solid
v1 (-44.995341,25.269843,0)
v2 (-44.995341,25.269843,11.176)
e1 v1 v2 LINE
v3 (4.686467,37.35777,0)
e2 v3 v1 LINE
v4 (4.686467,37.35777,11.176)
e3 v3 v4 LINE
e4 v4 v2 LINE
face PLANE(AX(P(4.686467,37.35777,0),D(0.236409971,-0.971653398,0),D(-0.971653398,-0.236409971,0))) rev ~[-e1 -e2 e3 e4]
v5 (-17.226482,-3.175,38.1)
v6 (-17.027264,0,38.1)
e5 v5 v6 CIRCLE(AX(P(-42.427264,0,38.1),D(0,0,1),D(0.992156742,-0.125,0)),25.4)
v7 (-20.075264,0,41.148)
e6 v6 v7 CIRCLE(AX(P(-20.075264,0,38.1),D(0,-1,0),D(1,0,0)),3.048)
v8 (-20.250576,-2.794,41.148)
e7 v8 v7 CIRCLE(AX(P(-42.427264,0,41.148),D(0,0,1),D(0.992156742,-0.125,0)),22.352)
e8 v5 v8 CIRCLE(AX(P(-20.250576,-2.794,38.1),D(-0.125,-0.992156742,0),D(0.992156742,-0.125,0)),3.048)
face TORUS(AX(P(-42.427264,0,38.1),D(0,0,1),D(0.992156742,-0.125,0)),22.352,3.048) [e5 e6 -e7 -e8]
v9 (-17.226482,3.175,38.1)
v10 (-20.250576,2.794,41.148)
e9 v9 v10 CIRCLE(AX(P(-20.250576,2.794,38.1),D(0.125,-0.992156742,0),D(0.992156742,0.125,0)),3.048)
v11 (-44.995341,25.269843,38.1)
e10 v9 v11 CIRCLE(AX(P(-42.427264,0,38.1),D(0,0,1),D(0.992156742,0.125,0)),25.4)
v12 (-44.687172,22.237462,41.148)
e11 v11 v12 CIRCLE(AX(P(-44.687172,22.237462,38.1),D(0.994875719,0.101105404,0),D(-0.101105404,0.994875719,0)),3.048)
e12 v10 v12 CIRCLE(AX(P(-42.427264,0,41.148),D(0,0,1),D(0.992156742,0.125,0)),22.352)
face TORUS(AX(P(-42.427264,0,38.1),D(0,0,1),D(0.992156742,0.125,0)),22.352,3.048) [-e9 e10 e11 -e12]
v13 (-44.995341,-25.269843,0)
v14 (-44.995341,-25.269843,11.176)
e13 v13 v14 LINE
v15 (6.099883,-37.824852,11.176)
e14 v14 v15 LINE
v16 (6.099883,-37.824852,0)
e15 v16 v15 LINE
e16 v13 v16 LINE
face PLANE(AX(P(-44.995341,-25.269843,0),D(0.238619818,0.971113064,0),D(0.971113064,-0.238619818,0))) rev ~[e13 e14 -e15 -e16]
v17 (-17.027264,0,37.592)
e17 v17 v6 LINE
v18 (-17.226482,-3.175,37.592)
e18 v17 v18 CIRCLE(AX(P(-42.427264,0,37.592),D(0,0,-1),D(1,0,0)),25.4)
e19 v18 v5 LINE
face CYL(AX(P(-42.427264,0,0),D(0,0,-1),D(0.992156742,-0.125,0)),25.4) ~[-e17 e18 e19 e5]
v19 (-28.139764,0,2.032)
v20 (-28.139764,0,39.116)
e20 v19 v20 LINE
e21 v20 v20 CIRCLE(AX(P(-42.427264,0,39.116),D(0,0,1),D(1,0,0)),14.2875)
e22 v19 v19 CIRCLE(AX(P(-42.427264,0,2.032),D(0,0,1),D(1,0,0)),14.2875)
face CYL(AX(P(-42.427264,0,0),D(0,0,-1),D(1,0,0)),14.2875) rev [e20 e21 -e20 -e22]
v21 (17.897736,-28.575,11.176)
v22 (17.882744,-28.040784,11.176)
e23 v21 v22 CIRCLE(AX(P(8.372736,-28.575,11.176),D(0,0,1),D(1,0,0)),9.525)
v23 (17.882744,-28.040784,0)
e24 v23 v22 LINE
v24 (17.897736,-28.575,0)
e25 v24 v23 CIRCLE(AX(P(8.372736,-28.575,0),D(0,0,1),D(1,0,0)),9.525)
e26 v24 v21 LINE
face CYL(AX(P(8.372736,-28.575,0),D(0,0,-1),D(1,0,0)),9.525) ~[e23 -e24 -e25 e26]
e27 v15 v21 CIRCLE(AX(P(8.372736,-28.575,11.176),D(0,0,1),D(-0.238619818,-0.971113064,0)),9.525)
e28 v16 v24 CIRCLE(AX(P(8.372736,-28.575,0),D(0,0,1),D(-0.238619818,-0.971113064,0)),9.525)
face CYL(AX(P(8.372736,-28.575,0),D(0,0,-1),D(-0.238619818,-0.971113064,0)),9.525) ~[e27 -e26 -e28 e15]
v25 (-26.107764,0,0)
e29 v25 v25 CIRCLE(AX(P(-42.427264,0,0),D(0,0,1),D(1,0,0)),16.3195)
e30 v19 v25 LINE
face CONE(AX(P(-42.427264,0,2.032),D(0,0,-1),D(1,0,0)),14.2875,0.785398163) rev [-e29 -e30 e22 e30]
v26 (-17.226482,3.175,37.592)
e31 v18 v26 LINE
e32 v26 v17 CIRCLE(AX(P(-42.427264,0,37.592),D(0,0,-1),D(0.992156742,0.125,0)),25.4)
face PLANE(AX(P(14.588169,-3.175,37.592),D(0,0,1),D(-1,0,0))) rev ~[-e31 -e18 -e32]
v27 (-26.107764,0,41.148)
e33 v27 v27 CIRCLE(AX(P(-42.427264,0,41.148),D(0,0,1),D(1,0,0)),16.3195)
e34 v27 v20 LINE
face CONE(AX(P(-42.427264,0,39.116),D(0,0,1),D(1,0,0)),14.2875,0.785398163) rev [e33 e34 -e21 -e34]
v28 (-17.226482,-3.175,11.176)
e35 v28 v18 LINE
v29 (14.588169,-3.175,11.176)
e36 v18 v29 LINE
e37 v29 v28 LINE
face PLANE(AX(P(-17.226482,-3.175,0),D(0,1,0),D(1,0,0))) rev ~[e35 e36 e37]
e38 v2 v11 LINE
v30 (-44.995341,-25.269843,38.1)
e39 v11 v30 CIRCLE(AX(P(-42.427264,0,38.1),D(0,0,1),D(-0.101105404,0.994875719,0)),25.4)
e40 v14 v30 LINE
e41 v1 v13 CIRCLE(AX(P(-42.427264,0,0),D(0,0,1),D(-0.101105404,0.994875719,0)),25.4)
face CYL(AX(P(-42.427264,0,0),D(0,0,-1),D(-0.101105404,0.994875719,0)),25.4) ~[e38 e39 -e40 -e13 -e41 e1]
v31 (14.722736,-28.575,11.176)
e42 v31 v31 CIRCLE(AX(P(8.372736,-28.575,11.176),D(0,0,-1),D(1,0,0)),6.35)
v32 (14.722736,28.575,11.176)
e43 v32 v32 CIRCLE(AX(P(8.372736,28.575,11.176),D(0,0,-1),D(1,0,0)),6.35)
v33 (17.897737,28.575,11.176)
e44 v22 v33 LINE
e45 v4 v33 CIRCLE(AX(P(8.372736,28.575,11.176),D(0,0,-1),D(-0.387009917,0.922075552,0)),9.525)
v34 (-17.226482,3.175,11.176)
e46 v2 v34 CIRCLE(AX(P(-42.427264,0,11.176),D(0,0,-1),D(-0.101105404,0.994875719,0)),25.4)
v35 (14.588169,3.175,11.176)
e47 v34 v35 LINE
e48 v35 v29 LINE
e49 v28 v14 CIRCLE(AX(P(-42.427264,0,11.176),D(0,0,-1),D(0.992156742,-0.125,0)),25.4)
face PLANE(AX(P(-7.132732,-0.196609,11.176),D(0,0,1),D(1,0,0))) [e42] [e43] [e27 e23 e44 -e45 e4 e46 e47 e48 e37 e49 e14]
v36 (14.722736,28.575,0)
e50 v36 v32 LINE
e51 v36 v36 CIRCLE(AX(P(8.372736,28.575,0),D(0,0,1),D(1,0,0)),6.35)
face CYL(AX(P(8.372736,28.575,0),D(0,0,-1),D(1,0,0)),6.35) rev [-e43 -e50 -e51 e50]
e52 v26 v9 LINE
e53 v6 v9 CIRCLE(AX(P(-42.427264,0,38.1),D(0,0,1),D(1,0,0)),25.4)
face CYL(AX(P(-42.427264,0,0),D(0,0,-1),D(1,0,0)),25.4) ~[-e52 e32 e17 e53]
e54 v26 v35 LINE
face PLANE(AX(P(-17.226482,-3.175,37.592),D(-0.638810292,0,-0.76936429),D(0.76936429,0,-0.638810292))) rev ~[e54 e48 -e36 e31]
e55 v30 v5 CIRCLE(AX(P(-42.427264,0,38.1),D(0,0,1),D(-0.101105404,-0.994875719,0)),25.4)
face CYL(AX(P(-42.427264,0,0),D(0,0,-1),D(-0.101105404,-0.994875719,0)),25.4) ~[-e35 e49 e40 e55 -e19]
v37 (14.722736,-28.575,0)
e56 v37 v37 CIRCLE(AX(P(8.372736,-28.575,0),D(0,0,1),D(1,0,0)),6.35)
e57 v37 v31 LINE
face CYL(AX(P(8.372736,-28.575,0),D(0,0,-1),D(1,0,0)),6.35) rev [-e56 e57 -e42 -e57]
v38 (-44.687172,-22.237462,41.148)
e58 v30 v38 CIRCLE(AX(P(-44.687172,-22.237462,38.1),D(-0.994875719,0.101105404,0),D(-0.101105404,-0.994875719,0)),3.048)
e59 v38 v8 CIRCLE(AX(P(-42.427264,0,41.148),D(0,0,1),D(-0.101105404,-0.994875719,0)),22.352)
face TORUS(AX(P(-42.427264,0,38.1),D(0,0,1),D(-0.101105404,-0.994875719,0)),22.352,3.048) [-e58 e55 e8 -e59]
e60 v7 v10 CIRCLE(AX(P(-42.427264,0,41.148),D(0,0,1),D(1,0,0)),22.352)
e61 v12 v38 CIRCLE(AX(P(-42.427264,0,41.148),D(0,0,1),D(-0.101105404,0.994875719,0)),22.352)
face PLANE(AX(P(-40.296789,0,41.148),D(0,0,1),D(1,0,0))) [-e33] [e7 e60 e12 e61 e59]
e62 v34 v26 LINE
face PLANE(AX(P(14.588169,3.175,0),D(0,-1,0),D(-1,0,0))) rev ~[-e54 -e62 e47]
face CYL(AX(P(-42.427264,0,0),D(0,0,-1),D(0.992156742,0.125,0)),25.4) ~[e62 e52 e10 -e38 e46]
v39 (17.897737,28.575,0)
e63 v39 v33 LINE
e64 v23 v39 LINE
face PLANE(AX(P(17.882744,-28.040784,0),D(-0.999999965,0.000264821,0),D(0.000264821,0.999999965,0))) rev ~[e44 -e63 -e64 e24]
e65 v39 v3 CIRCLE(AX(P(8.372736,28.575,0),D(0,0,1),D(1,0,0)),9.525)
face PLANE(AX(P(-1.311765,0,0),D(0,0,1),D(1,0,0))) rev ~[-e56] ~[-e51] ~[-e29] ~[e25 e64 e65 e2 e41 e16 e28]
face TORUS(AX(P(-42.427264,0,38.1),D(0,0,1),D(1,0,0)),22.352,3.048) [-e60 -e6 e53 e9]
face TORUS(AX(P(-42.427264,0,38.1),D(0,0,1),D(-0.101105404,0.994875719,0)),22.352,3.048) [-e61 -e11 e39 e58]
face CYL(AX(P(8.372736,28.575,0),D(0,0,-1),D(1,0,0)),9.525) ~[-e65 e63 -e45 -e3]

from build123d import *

# Parameters (mm, degrees)
F0_R     = 14.2875
F1_DEPTH = 41.148
F0_R_2   = 6.35
F2_DEPTH = 11.176
F3_DEPTH = 37.592
F5_DEPTH = 127
F6_DEPTH = 76.2
F7_R     = 3.048
F8_SIZE2 = 2.032
F8_SIZE  = 2.032
F9_SIZE2 = 2.032
F9_SIZE  = 2.032


# Not quite as in the source:
# - ends of sketch curves that miss each other by under 0.0002 mm in the source are joined


with BuildPart() as f1:
    # F0 (on Top) → F1 (new body)
    with BuildSketch(Plane.XY):
        with BuildLine():
            ThreePointArc((-17.226482478, 3.175), (-26.6125443992, 19.8759818106), (-44.9953409853, 25.2698432749))
            ThreePointArc((-44.9953409853, 25.2698432749), (-67.8272637159, 0), (-44.9953409853, -25.2698432749))
            ThreePointArc((-44.9953409853, -25.2698432749), (-26.6125443992, -19.8759818106), (-17.226482478, -3.175))
            Line((-17.226482478, -3.175), (-23.8334226287, -3.175))
            Line((-23.8334226287, -3.175), (-23.8334226287, 3.175))
            Line((-23.8334226287, 3.175), (-17.226482478, 3.175))
        make_face()
        with Locations((-42.4272637159, 0)):
            Circle(F0_R, mode=Mode.SUBTRACT)
        with BuildLine():
            ThreePointArc((-17.0272637159, 0), (-17.0771173313, 1.5906219786), (-17.226482478, 3.175))
            Line((-17.226482478, 3.175), (-23.8334226287, 3.175))
            Line((-23.8334226287, 3.175), (-23.8334226287, -3.175))
            Line((-23.8334226287, -3.175), (-17.226482478, -3.175))
            ThreePointArc((-17.226482478, -3.175), (-17.0771173313, -1.5906219786), (-17.0272637159, 0))
        make_face()
    extrude(amount=F1_DEPTH)

    # F0 (on Top) → F2 (join)
    with BuildSketch(Plane.XY):
        with BuildLine():
            Line((4.6864668266, 37.3577696364), (-44.9953409853, 25.2698432749))
            ThreePointArc((-44.9953409853, 25.2698432749), (-26.6125443992, 19.8759818106), (-17.226482478, 3.175))
            Line((-17.226482478, 3.175), (14.5881694606, 3.175))
            Line((14.5881694606, 3.175), (14.5881694606, -3.175))
            Line((14.5881694606, -3.175), (-17.226482478, -3.175))
            ThreePointArc((-17.226482478, -3.175), (-26.6125443992, -19.8759818106), (-44.9953409853, -25.2698432749))
            Line((-44.9953409853, -25.2698432749), (6.0998825197, -37.8248519321))
            ThreePointArc((6.0998825197, -37.8248519321), (2.2878291463, -21.247003676), (17.8827435435, -28.0407838216))
            Line((17.8827435435, -28.0407838216), (17.8977366181, 28.575))
            ThreePointArc((17.8977366181, 28.575), (3.0995063243, 20.6428709799), (4.6864668266, 37.3577696364))
        make_face()
        with BuildLine():
            ThreePointArc((17.8827435435, -28.0407838216), (2.2878291463, -21.247003676), (6.0998825197, -37.8248519321))
            ThreePointArc((6.0998825197, -37.8248519321), (14.2496697061, -36.0708174039), (17.8977362841, -28.575))
            ThreePointArc((17.8977362841, -28.575), (17.8939873612, -28.307786739), (17.8827435435, -28.0407838216))
        make_face()
        with Locations((8.3727362841, -28.575)):
            Circle(F0_R_2, mode=Mode.SUBTRACT)
        with BuildLine():
            ThreePointArc((4.6864668266, 37.3577696364), (3.0995063243, 20.6428709799), (17.8977362841, 28.575))
            ThreePointArc((17.8977362841, 28.575), (13.6459662439, 36.5071290201), (4.6864668266, 37.3577696364))
        make_face()
        with Locations((8.3727362841, 28.575)):
            Circle(F0_R_2, mode=Mode.SUBTRACT)
        with BuildLine():
            Line((14.5881694606, 3.175), (-17.226482478, 3.175))
            ThreePointArc((-17.226482478, 3.175), (-17.0771173313, 1.5906219786), (-17.0272637159, 0))
            ThreePointArc((-17.0272637159, 0), (-17.0771173313, -1.5906219786), (-17.226482478, -3.175))
            Line((-17.226482478, -3.175), (14.5881694606, -3.175))
            Line((14.5881694606, -3.175), (14.5881694606, 3.175))
        make_face()
        with Locations((8.3727362841, 28.575)):
            Circle(F0_R_2)
        with Locations((8.3727362841, -28.575)):
            Circle(F0_R_2)
        with BuildLine():
            ThreePointArc((-17.0272637159, 0), (-17.0771173313, 1.5906219786), (-17.226482478, 3.175))
            Line((-17.226482478, 3.175), (-23.8334226287, 3.175))
            Line((-23.8334226287, 3.175), (-23.8334226287, -3.175))
            Line((-23.8334226287, -3.175), (-17.226482478, -3.175))
            ThreePointArc((-17.226482478, -3.175), (-17.0771173313, -1.5906219786), (-17.0272637159, 0))
        make_face()
    extrude(amount=F2_DEPTH)

    # F0 (on Top) → F3 (join)
    with BuildSketch(Plane.XY):
        with BuildLine():
            Line((14.5881694606, 3.175), (-17.226482478, 3.175))
            ThreePointArc((-17.226482478, 3.175), (-17.0771173313, 1.5906219786), (-17.0272637159, 0))
            ThreePointArc((-17.0272637159, 0), (-17.0771173313, -1.5906219786), (-17.226482478, -3.175))
            Line((-17.226482478, -3.175), (14.5881694606, -3.175))
            Line((14.5881694606, -3.175), (14.5881694606, 3.175))
        make_face()
    extrude(amount=F3_DEPTH)

    # F4 (on face) → F5 (cut)
    with BuildSketch(Plane.XZ.offset(3.175)):
        Polygon((14.5881694606, 37.592), (-17.226482478, 37.592), (14.5881694606, 11.176), align=None)
    extrude(amount=-F5_DEPTH, mode=Mode.SUBTRACT)

    # F0 (on Top) → F6 (cut)
    with BuildSketch(Plane.XY):
        with Locations((8.3727362841, 28.575)):
            Circle(F0_R_2)
        with Locations((8.3727362841, -28.575)):
            Circle(F0_R_2)
    extrude(amount=F6_DEPTH, mode=Mode.SUBTRACT)

    # F7
    f7_edges = [f1.edges().sort_by_distance(p)[0] for p in [
        (-39.859186, -25.269843, 41.148),
    ]]
    fillet(f7_edges, radius=F7_R)

    # F8
    f8_edges = [f1.edges().sort_by_distance(p)[0] for p in [
        (-56.714764, 0, 41.148),
        (-40.167356, -22.237462, 41.148),
    ]]
    chamfer(f8_edges, length=F8_SIZE, length2=F8_SIZE2)

    # F9
    f9_edges = [f1.edges().sort_by_distance(p)[0] for p in [
        (-56.714764, 0, 0),
    ]]
    chamfer(f9_edges, length=F9_SIZE, length2=F9_SIZE2)


solid = f1.part
